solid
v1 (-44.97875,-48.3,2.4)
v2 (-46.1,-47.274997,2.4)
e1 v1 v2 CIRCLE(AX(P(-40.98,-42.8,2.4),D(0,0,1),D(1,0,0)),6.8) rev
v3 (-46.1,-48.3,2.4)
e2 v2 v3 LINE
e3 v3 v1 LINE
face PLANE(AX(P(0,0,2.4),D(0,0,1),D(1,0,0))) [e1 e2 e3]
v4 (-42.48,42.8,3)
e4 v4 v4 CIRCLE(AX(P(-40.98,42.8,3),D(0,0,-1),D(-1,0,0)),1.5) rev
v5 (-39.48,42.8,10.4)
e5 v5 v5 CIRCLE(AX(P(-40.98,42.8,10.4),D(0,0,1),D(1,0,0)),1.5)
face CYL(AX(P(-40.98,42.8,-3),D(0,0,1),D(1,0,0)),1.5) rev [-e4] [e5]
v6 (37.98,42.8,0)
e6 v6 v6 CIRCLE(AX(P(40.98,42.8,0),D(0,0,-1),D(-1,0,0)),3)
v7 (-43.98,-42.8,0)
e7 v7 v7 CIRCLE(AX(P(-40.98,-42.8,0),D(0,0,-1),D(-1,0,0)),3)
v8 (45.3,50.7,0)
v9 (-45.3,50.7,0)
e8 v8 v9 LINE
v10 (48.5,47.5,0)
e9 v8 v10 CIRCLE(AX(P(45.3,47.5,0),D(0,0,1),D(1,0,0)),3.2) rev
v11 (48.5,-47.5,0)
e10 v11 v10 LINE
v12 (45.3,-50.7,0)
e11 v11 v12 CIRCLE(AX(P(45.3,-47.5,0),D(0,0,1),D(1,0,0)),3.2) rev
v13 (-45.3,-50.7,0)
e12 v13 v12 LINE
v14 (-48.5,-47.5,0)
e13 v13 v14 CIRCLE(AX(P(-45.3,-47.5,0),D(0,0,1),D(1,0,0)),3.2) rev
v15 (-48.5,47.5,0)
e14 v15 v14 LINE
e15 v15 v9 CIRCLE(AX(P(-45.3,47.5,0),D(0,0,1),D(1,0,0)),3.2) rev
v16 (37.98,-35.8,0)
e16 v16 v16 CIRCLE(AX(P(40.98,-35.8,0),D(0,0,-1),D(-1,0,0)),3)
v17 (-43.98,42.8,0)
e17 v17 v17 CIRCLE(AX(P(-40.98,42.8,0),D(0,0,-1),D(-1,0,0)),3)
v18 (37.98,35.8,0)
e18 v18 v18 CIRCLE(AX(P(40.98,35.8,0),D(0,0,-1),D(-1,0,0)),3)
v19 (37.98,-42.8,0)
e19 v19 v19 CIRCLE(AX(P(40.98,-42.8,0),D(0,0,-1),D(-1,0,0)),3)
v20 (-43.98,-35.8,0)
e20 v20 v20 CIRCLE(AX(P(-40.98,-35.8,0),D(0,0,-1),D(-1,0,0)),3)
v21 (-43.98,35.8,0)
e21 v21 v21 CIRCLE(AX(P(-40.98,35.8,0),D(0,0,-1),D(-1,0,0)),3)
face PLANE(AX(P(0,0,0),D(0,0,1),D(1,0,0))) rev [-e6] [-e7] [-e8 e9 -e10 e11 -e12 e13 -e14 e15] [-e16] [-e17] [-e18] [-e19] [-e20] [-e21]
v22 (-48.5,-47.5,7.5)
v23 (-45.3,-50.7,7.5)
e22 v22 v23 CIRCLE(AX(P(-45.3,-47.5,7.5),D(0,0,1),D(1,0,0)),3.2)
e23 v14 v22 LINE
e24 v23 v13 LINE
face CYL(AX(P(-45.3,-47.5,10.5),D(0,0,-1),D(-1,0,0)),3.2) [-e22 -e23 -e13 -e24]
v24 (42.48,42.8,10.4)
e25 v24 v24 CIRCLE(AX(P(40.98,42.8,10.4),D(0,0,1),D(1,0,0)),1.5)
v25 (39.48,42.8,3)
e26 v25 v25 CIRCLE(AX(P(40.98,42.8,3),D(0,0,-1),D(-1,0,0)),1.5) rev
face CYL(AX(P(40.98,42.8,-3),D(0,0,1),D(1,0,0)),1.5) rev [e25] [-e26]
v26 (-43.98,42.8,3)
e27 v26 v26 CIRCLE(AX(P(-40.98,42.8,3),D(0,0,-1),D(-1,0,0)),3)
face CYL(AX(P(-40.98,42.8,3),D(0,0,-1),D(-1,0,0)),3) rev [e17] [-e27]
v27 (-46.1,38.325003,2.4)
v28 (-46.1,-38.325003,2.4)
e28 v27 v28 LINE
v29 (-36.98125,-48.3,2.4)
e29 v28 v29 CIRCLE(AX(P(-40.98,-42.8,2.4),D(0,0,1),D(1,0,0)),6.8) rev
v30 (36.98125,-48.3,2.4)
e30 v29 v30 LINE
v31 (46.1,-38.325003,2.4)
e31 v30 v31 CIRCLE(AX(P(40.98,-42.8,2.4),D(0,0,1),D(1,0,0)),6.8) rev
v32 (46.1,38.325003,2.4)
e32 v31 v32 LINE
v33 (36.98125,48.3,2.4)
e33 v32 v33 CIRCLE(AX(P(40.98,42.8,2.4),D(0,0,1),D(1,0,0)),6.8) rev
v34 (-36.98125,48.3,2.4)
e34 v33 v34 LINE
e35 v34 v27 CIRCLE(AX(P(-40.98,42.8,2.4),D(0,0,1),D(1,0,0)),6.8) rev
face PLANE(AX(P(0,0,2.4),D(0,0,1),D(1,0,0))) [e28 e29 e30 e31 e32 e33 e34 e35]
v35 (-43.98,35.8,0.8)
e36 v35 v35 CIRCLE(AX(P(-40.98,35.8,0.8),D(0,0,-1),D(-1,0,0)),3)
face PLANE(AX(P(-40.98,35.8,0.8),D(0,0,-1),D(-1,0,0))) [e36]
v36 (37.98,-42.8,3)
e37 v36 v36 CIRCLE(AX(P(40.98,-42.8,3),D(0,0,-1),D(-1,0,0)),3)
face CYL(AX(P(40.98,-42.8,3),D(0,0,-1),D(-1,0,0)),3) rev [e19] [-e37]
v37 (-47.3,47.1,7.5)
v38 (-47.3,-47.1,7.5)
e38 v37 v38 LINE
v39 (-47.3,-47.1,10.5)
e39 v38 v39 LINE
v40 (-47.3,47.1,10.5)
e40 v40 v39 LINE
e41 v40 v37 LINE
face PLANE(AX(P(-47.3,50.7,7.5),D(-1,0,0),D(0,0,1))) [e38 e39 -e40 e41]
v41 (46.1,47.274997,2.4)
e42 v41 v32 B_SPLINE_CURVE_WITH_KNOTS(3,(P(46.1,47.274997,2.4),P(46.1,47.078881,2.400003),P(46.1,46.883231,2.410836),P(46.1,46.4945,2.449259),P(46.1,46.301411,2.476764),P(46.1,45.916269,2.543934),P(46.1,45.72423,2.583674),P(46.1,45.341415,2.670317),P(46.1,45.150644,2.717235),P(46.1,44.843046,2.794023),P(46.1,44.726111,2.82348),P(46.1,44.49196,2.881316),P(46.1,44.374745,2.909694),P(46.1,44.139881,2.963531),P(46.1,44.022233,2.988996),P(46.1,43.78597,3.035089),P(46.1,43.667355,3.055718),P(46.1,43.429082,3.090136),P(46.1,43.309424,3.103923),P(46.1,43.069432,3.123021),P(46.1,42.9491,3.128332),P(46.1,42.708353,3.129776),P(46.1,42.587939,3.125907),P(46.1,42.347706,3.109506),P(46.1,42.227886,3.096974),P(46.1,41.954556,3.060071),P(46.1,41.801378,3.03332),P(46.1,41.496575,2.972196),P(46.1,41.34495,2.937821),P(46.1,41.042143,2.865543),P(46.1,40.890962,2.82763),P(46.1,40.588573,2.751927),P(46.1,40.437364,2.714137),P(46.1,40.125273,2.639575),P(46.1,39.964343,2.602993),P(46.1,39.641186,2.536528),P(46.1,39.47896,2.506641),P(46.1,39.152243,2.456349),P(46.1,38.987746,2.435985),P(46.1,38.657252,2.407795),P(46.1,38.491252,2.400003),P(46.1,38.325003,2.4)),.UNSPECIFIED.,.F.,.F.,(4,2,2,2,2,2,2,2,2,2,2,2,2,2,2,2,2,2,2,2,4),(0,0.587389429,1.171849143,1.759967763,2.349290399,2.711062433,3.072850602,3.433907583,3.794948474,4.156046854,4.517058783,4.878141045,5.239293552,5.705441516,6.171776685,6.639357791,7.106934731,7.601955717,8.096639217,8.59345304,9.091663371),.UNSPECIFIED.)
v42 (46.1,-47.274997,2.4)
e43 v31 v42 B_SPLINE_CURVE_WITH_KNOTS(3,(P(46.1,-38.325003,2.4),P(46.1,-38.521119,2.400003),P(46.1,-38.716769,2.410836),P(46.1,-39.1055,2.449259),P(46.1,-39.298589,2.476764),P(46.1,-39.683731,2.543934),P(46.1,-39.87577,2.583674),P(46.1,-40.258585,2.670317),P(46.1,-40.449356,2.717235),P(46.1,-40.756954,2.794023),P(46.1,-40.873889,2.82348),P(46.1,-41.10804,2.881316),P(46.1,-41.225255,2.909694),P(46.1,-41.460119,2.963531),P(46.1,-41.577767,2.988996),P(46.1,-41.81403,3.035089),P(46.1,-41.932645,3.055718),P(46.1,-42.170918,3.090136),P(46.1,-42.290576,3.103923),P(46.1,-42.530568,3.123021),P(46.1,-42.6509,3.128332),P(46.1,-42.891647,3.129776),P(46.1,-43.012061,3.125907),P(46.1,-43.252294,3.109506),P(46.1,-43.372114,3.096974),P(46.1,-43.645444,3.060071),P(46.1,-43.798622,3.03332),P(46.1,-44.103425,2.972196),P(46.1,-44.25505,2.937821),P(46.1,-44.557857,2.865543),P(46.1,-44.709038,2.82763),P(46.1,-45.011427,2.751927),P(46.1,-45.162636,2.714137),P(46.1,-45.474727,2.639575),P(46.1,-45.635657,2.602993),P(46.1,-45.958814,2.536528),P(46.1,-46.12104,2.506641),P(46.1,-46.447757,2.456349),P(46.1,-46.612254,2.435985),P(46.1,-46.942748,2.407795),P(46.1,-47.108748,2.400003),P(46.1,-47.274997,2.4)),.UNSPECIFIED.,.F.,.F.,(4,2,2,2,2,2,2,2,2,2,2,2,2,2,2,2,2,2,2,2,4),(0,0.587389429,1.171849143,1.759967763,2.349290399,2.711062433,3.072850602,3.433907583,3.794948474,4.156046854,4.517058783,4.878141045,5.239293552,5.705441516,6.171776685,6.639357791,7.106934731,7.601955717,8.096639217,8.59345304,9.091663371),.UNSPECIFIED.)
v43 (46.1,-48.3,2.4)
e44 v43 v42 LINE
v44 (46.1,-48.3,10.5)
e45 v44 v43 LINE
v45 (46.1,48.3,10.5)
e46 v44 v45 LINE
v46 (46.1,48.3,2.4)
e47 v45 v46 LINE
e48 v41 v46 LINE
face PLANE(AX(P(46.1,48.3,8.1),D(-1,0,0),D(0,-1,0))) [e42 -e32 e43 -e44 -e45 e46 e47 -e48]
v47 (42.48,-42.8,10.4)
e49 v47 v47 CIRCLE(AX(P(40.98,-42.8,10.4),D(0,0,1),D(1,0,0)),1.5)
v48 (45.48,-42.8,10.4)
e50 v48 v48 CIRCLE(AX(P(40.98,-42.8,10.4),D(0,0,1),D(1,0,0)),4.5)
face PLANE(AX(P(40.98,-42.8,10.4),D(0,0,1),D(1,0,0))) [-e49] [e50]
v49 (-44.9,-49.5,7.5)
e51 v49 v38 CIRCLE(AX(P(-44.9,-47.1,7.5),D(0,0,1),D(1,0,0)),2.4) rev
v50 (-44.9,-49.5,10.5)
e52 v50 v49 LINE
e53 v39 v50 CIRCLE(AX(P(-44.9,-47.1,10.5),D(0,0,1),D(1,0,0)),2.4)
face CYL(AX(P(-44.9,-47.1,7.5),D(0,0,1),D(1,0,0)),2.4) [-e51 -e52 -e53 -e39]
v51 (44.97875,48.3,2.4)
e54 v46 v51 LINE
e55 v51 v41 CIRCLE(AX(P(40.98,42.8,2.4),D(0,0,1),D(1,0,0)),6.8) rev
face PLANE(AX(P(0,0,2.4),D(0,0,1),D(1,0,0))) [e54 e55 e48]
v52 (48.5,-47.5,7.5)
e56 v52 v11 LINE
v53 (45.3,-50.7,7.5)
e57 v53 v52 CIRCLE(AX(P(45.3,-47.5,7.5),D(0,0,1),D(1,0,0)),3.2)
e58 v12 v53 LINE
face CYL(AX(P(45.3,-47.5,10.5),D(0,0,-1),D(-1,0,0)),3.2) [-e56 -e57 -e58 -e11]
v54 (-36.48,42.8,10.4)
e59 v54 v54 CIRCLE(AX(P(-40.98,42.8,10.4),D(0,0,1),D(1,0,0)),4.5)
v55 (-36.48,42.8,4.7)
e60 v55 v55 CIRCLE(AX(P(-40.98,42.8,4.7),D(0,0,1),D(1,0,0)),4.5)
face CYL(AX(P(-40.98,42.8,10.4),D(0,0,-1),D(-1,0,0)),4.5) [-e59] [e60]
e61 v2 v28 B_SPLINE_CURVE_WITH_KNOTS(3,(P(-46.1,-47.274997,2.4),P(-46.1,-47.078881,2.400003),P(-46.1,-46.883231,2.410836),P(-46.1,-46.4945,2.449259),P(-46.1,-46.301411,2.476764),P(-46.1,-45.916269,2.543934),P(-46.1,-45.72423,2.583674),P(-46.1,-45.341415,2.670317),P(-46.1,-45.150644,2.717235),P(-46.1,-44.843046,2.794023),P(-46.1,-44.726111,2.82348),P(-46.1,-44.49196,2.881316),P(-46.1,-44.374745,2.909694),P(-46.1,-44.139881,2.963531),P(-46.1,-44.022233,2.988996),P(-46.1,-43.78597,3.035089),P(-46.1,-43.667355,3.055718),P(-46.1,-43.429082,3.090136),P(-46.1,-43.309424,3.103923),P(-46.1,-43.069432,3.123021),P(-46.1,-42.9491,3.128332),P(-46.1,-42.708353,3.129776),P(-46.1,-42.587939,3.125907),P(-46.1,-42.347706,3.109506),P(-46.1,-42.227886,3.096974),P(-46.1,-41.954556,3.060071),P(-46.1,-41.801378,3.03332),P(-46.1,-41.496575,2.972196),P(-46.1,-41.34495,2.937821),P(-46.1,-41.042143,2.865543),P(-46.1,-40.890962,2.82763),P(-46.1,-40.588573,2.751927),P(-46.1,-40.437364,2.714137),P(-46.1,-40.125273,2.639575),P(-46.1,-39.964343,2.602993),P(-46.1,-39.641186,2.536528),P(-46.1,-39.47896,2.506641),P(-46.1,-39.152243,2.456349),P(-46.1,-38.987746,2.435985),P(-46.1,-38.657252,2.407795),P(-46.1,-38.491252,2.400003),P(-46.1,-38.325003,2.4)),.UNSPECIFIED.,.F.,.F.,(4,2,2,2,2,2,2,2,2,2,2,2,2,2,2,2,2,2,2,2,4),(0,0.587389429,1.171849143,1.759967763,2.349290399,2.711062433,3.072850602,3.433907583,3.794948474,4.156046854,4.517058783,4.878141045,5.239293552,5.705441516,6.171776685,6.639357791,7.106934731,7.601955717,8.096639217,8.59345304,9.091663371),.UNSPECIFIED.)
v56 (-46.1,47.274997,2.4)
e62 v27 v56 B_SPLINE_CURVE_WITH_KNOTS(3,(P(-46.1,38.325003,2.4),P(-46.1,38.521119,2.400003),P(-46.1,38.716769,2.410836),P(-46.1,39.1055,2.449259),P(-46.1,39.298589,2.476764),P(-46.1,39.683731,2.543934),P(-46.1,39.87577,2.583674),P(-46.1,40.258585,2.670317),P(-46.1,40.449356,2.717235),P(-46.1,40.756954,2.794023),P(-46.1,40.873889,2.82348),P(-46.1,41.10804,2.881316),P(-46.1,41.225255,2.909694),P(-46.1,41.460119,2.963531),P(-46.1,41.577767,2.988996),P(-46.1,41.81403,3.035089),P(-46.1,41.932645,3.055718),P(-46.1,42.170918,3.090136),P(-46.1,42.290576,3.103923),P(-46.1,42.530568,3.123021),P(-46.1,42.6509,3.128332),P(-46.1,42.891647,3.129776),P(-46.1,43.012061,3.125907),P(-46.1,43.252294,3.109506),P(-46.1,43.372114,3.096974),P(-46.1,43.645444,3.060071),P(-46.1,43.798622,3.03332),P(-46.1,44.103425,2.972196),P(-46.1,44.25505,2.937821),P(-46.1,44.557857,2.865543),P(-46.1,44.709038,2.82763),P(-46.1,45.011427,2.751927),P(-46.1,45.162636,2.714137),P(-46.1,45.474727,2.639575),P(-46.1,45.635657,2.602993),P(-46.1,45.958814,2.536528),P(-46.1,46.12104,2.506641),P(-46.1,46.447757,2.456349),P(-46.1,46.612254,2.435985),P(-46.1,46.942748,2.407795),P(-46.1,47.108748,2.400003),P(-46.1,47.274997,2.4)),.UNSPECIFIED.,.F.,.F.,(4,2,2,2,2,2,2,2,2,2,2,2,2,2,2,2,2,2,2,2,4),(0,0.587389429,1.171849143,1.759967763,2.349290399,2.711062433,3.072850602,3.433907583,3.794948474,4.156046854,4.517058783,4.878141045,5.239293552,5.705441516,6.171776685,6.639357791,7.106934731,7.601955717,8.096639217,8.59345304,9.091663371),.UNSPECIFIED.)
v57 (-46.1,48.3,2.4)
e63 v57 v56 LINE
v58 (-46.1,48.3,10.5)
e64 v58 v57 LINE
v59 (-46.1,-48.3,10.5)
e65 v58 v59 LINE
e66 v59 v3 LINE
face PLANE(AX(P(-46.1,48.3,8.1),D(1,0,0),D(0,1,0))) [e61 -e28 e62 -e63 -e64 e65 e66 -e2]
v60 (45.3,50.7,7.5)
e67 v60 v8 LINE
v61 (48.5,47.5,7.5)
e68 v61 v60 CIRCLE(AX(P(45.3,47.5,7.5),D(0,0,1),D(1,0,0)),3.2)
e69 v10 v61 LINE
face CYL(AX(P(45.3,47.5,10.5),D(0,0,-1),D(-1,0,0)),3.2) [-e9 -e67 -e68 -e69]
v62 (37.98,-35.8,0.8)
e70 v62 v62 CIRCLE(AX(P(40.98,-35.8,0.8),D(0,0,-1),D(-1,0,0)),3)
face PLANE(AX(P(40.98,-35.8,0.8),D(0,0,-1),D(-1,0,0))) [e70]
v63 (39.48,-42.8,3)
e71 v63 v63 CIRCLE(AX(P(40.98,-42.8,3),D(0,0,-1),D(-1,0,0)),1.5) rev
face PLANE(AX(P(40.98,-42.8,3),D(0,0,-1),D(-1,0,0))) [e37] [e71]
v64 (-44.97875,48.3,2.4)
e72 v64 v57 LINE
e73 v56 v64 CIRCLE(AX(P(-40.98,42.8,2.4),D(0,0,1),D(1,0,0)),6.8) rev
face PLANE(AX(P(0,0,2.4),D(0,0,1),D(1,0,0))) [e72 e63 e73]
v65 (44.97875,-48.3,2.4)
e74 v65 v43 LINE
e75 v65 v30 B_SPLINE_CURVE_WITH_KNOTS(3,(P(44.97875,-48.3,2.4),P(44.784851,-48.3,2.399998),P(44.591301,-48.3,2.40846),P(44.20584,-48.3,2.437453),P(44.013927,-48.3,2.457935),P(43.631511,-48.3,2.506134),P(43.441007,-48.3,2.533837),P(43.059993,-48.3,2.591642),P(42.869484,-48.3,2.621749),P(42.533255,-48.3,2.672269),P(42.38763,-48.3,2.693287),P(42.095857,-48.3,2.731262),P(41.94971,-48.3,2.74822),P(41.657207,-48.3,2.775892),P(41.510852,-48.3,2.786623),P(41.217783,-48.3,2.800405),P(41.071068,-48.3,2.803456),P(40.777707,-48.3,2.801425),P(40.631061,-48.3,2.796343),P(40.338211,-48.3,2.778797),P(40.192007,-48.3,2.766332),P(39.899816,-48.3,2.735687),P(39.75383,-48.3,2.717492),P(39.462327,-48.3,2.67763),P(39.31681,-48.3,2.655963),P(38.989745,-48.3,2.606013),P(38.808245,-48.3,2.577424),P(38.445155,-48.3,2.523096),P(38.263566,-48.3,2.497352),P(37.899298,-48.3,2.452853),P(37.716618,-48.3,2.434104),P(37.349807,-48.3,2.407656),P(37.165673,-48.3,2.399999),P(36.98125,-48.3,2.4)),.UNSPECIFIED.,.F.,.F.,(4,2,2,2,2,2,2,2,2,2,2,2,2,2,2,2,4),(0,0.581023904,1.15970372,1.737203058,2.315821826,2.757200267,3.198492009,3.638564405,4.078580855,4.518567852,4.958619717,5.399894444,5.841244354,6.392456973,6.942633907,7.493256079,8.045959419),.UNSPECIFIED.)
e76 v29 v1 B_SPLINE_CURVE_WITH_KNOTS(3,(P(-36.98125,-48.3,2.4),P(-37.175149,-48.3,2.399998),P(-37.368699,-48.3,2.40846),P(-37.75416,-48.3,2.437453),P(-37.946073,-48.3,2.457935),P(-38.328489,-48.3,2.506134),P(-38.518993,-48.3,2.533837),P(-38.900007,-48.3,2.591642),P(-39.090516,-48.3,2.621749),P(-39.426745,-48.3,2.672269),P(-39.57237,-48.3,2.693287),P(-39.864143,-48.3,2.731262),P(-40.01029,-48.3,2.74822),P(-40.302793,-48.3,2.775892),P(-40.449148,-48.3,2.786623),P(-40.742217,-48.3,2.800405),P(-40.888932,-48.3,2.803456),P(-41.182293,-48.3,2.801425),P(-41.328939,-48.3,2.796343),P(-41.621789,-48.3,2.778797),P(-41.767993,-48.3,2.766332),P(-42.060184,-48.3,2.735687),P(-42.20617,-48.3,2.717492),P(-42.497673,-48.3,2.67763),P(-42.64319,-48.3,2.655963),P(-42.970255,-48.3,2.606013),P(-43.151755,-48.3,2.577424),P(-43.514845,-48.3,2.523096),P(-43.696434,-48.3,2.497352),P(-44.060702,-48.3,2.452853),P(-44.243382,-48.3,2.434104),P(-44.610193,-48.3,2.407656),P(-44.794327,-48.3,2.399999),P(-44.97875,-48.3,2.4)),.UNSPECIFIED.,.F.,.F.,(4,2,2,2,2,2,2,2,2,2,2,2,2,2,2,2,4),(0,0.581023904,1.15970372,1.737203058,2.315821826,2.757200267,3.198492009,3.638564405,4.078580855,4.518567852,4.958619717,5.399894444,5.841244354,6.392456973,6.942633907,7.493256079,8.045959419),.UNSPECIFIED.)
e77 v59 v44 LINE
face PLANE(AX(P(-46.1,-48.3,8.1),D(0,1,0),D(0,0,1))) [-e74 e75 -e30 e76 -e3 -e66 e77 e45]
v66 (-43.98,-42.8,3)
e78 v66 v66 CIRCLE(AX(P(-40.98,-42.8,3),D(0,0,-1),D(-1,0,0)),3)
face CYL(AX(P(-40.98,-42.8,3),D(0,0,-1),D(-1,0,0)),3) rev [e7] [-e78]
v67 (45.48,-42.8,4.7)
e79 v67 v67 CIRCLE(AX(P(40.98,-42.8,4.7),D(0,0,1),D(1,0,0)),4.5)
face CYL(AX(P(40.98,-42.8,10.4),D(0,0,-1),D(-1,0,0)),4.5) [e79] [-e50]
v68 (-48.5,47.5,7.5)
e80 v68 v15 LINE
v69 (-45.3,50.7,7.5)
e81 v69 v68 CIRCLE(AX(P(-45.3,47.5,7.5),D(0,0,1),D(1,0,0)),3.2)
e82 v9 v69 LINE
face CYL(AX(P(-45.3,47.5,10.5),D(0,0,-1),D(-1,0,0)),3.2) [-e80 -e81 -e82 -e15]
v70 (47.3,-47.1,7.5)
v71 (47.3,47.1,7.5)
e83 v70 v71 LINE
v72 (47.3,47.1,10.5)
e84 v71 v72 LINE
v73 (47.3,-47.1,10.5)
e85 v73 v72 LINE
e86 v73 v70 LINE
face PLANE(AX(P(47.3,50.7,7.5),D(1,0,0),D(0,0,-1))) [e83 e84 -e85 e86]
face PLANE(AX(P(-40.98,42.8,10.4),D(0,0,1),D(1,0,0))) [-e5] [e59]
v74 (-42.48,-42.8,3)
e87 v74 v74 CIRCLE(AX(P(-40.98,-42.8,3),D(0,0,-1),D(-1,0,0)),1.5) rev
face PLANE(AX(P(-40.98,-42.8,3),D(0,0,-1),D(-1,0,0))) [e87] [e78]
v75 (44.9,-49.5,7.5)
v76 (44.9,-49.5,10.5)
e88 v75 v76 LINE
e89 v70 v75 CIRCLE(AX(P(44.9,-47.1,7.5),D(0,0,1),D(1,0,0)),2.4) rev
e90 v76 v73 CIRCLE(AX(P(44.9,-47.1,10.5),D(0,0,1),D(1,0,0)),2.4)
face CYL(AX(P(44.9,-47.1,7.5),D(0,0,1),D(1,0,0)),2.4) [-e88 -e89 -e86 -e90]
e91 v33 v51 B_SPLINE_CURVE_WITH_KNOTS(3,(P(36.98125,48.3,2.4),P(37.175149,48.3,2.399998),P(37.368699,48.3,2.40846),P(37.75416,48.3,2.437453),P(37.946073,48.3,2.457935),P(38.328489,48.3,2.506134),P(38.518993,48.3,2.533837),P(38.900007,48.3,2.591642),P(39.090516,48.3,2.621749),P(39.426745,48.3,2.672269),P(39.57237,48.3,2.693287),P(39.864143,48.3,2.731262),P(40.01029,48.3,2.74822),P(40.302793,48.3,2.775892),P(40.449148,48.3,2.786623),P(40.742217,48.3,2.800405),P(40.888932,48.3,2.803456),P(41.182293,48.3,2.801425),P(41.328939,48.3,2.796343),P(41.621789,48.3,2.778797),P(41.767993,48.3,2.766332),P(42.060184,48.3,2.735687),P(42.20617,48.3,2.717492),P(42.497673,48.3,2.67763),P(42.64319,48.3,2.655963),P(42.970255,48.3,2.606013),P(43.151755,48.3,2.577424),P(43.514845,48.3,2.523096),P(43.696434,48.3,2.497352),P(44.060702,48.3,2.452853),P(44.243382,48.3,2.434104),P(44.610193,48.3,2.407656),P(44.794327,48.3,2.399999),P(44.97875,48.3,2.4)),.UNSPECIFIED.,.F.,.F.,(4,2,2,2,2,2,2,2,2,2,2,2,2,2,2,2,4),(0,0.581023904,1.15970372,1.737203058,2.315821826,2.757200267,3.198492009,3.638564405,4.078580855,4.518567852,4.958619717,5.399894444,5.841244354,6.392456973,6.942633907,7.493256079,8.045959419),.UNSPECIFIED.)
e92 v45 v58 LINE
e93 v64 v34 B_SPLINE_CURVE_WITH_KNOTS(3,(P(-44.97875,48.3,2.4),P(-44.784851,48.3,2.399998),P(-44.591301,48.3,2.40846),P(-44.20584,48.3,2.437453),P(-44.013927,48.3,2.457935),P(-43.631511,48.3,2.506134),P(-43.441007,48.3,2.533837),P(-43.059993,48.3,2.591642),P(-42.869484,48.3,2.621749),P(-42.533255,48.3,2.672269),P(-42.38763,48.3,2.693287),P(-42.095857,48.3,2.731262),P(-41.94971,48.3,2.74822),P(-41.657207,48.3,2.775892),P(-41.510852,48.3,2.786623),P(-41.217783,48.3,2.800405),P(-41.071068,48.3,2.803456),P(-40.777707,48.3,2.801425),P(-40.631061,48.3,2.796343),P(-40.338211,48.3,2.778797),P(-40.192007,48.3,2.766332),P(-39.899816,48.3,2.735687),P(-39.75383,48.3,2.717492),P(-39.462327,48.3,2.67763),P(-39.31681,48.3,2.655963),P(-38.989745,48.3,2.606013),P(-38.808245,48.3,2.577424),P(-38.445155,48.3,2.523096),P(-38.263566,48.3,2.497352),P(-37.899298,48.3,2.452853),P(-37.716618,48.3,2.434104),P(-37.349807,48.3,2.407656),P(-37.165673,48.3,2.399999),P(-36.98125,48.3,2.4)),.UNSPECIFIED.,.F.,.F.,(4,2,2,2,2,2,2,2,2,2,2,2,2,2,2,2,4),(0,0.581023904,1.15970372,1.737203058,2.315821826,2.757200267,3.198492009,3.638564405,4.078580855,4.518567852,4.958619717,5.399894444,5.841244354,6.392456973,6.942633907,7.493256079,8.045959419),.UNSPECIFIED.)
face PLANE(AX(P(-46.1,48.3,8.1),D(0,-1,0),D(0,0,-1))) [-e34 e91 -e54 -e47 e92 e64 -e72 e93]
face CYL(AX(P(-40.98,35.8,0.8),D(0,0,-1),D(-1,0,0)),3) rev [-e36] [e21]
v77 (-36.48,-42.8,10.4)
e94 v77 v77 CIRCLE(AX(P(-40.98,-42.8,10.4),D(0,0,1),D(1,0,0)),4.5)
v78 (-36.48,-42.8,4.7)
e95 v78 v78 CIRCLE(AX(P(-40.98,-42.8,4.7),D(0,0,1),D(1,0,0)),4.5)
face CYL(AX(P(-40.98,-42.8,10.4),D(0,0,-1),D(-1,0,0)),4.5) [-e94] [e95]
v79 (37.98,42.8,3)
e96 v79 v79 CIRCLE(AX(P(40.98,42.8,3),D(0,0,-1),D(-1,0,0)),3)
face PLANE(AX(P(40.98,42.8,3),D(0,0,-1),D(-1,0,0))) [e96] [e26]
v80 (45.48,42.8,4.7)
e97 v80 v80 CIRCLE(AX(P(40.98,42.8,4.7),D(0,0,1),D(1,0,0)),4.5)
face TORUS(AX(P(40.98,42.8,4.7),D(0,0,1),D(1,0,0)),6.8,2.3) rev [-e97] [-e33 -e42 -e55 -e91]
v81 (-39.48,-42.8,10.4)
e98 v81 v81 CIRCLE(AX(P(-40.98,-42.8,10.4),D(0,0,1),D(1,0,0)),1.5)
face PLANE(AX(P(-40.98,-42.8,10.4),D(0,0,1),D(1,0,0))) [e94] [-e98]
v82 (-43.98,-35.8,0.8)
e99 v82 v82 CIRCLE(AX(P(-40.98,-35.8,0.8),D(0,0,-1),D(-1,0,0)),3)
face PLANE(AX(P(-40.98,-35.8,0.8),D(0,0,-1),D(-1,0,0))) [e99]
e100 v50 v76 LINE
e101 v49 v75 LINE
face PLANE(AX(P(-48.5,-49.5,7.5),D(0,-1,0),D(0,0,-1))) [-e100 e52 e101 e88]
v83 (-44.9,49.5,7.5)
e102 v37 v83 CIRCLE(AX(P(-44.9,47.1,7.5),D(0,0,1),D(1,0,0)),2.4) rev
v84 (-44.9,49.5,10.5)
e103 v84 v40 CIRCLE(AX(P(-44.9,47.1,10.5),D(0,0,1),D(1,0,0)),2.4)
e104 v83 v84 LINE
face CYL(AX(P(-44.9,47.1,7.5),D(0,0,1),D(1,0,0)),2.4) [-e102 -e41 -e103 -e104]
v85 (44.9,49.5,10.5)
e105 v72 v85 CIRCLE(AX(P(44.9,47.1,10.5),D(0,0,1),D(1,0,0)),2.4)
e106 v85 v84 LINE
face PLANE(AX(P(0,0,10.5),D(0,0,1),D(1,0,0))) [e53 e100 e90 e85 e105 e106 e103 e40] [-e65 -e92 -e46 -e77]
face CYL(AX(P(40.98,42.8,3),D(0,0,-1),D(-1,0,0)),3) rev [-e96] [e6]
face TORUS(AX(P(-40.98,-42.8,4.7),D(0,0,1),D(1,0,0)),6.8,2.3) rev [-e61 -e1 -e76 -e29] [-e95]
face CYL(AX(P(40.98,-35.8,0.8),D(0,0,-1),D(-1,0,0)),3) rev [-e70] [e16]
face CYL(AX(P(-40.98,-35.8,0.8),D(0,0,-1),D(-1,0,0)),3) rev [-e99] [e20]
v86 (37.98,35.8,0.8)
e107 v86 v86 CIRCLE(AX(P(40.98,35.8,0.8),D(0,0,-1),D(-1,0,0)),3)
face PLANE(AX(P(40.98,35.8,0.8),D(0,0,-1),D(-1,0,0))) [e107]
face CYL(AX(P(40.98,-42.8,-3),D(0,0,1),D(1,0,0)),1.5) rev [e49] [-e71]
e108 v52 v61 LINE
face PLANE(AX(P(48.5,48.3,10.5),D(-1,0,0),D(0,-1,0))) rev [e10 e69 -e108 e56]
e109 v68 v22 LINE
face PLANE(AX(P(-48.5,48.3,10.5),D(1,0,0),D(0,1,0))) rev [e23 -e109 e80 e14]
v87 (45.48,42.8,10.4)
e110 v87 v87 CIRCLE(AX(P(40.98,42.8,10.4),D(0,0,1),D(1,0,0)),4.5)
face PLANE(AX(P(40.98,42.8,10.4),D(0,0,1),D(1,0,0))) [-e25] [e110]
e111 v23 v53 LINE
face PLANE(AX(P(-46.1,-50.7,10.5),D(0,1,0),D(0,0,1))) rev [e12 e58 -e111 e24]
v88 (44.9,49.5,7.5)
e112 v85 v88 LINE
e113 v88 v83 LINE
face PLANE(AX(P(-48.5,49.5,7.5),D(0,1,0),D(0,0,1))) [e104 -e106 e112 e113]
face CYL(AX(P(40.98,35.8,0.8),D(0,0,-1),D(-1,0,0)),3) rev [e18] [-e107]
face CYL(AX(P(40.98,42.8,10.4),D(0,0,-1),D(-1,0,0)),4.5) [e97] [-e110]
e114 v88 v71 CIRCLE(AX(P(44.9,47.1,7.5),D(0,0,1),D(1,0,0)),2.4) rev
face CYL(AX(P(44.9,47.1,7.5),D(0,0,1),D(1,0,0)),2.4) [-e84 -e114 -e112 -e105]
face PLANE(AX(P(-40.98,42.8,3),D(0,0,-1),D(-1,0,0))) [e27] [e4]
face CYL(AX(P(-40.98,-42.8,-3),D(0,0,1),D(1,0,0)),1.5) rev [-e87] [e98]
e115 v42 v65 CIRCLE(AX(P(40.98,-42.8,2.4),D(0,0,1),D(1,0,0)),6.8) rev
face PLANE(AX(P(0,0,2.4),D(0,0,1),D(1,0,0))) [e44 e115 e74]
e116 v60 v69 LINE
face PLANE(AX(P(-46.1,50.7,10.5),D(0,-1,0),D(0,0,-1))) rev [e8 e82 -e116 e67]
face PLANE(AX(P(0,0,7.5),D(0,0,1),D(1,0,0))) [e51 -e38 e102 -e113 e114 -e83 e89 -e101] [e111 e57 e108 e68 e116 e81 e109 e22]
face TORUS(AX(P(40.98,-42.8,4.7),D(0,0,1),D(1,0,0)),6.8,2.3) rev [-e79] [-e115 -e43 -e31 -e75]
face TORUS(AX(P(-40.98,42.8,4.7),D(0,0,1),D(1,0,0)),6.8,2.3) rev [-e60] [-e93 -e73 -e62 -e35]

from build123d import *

# Parameters (mm, degrees)
EXTRUDE_THIN1_OUTLINE_W     = 97
EXTRUDE_THIN1_OUTLINE_H     = 101.4
EXTRUDE_THIN1_DEPTH         = 2.4
EXTRUDE_THIN1_START         = 8.1
EXTRUDE_THIN1_2_OUTLINE_W   = 97
EXTRUDE_THIN1_2_OUTLINE_H   = 101.4
EXTRUDE_THIN1_2_DEPTH       = 2.4
EXTRUDE_THIN1_START_2       = 2.4
EXTRUDE_THIN1_3_OUTLINE_W   = 97
EXTRUDE_THIN1_3_OUTLINE_H   = 101.4
EXTRUDE_THIN1_3_OUTLINE_W_2 = 92.2
EXTRUDE_THIN1_3_OUTLINE_H_2 = 96.6
EXTRUDE_THIN1_3_DEPTH       = 5.7
SKETCH4_W                   = 92.2
SKETCH4_H                   = 96.6
CUT_EXTRUDE2_DEPTH          = 2.4
SKETCH5_R                   = 4.5
BOSS_EXTRUDE1_DEPTH         = 8
SKETCH7_R                   = 1.5
CUT_EXTRUDE3_DEPTH          = 13.4
SKETCH10_R                  = 3
CUT_EXTRUDE4_DEPTH          = 3
SKETCH11_R                  = 3
CUT_EXTRUDE5_DEPTH          = 0.8
SKETCH12_W                  = 97
SKETCH12_H                  = 101.4
SKETCH12_W_2                = 94.6
SKETCH12_H_2                = 99
CUT_EXTRUDE_THIN2_DEPTH     = 3
FILLET2_R                   = 3.2
FILLET3_R                   = 2.4
FILLET4_R                   = 2.3


# Read off the part's stored shape, not the designer's step: Extrude-Thin1
with BuildPart() as part:
    # Extrude-Thin1 outline → Extrude-Thin1 (new body)
    with BuildSketch(Plane.XY):
        Rectangle(EXTRUDE_THIN1_OUTLINE_W, EXTRUDE_THIN1_OUTLINE_H)
    extrude(amount=EXTRUDE_THIN1_DEPTH)



with BuildPart() as body_2:
    # Extrude-Thin1 2 outline → Extrude-Thin1 2 (new body)
    with BuildSketch(Plane.XY.offset(EXTRUDE_THIN1_START)):
        Rectangle(EXTRUDE_THIN1_2_OUTLINE_W, EXTRUDE_THIN1_2_OUTLINE_H)
    extrude(amount=EXTRUDE_THIN1_2_DEPTH)


with BuildPart() as part_1:
    add(part.part)

    add(body_2.part)  # Extrude-Thin1 3 merges body 2
    # Extrude-Thin1 3 outline → Extrude-Thin1 3 (add)
    with BuildSketch(Plane.XY.offset(EXTRUDE_THIN1_START_2)):
        Rectangle(EXTRUDE_THIN1_3_OUTLINE_W, EXTRUDE_THIN1_3_OUTLINE_H)
        Rectangle(EXTRUDE_THIN1_3_OUTLINE_W_2, EXTRUDE_THIN1_3_OUTLINE_H_2, mode=Mode.SUBTRACT)
    extrude(amount=EXTRUDE_THIN1_3_DEPTH)

    # Sketch4 → Cut-Extrude2 (cut)
    with BuildSketch(Plane.XY.offset(10.5)):
        Rectangle(SKETCH4_W, SKETCH4_H)
    extrude(amount=-CUT_EXTRUDE2_DEPTH, mode=Mode.SUBTRACT)

    # Sketch5 → Boss-Extrude1 (add)
    with BuildSketch(Plane.XY.offset(2.4)):
        with Locations((-40.98, 42.8)):
            Circle(SKETCH5_R)
        with Locations((40.98, 42.8)):
            Circle(SKETCH5_R)
        with Locations((40.98, -42.8)):
            Circle(SKETCH5_R)
        with Locations((-40.98, -42.8)):
            Circle(SKETCH5_R)
    extrude(amount=BOSS_EXTRUDE1_DEPTH)

    # Sketch7 → Cut-Extrude3 (cut)
    with BuildSketch(Plane.XY.offset(10.4)):
        with Locations((-40.98, 42.8)):
            Circle(SKETCH7_R)
        with Locations((40.98, 42.8)):
            Circle(SKETCH7_R)
        with Locations((40.98, -42.8)):
            Circle(SKETCH7_R)
        with Locations((-40.98, -42.8)):
            Circle(SKETCH7_R)
    extrude(amount=-CUT_EXTRUDE3_DEPTH, mode=Mode.SUBTRACT)

    # Sketch10 → Cut-Extrude4 (cut)
    with BuildSketch(Plane(origin=(0, 0, 0), x_dir=(-1, 0, 0), z_dir=(0, 0, -1))):
        with Locations((-40.98, 42.8)):
            Circle(SKETCH10_R)
        with Locations((40.98, 42.8)):
            Circle(SKETCH10_R)
        with Locations((40.98, -42.8)):
            Circle(SKETCH10_R)
        with Locations((-40.98, -42.8)):
            Circle(SKETCH10_R)
    extrude(amount=-CUT_EXTRUDE4_DEPTH, mode=Mode.SUBTRACT)

    # Sketch11 → Cut-Extrude5 (cut)
    with BuildSketch(Plane(origin=(0, 0, 0), x_dir=(-1, 0, 0), z_dir=(0, 0, -1))):
        with Locations((-40.98, -35.8)):
            Circle(SKETCH11_R)
        with Locations((40.98, -35.8)):
            Circle(SKETCH11_R)
        with Locations((40.98, 35.8)):
            Circle(SKETCH11_R)
        with Locations((-40.98, 35.8)):
            Circle(SKETCH11_R)
    extrude(amount=-CUT_EXTRUDE5_DEPTH, mode=Mode.SUBTRACT)

    # Sketch12 → Cut-Extrude-Thin2 (cut)
    with BuildSketch(Plane.XY.offset(10.5)):
        Rectangle(SKETCH12_W, SKETCH12_H)
        Rectangle(SKETCH12_W_2, SKETCH12_H_2, mode=Mode.SUBTRACT)
    extrude(amount=-CUT_EXTRUDE_THIN2_DEPTH, mode=Mode.SUBTRACT)

    # Fillet2
    fillet2_edges = [part_1.edges().sort_by_distance(p)[0] for p in [
        (48.5, -50.7, 3.75),
        (-48.5, -50.7, 3.75),
        (-48.5, 50.7, 3.75),
        (48.5, 50.7, 3.75),
    ]]
    fillet(fillet2_edges, radius=FILLET2_R)

    # Fillet3
    fillet3_edges = [part_1.edges().sort_by_distance(p)[0] for p in [
        (-47.3, 49.5, 9),
        (47.3, 49.5, 9),
        (47.3, -49.5, 9),
        (-47.3, -49.5, 9),
    ]]
    fillet(fillet3_edges, radius=FILLET3_R)

    # Fillet4
    # the kernel refuses this fillet: 2.3 mm, written as the material it adds along each edge
    with BuildSketch(Plane(origin=(-40.98, 42.8, 2.4), x_dir=(1, 0, 0), z_dir=(0, -1, 0))) as fillet4_piece_1:
        with BuildLine():
            CenterArc((4.5 + FILLET4_R, FILLET4_R), FILLET4_R, 180, 90)
            Line((4.5, FILLET4_R), (4.5, 0))
            Line((4.5, 0), (4.5 + FILLET4_R, 0))
        make_face()
    revolve(axis=Axis((-40.98, 42.8, 2.4), (0, 0, 1)))
    with BuildSketch(Plane(origin=(40.98, 42.8, 2.4), x_dir=(1, 0, 0), z_dir=(0, -1, 0))) as fillet4_piece_2:
        with BuildLine():
            CenterArc((4.5 + FILLET4_R, FILLET4_R), FILLET4_R, 180, 90)
            Line((4.5, FILLET4_R), (4.5, 0))
            Line((4.5, 0), (4.5 + FILLET4_R, 0))
        make_face()
    revolve(axis=Axis((40.98, 42.8, 2.4), (0, 0, 1)))
    with BuildSketch(Plane(origin=(40.98, -42.8, 2.4), x_dir=(1, 0, 0), z_dir=(0, -1, 0))) as fillet4_piece_3:
        with BuildLine():
            CenterArc((4.5 + FILLET4_R, FILLET4_R), FILLET4_R, 180, 90)
            Line((4.5, FILLET4_R), (4.5, 0))
            Line((4.5, 0), (4.5 + FILLET4_R, 0))
        make_face()
    revolve(axis=Axis((40.98, -42.8, 2.4), (0, 0, 1)))
    with BuildSketch(Plane(origin=(-40.98, -42.8, 2.4), x_dir=(1, 0, 0), z_dir=(0, -1, 0))) as fillet4_piece_4:
        with BuildLine():
            CenterArc((4.5 + FILLET4_R, FILLET4_R), FILLET4_R, 180, 90)
            Line((4.5, FILLET4_R), (4.5, 0))
            Line((4.5, 0), (4.5 + FILLET4_R, 0))
        make_face()
    revolve(axis=Axis((-40.98, -42.8, 2.4), (0, 0, 1)))


solid = part_1.part
